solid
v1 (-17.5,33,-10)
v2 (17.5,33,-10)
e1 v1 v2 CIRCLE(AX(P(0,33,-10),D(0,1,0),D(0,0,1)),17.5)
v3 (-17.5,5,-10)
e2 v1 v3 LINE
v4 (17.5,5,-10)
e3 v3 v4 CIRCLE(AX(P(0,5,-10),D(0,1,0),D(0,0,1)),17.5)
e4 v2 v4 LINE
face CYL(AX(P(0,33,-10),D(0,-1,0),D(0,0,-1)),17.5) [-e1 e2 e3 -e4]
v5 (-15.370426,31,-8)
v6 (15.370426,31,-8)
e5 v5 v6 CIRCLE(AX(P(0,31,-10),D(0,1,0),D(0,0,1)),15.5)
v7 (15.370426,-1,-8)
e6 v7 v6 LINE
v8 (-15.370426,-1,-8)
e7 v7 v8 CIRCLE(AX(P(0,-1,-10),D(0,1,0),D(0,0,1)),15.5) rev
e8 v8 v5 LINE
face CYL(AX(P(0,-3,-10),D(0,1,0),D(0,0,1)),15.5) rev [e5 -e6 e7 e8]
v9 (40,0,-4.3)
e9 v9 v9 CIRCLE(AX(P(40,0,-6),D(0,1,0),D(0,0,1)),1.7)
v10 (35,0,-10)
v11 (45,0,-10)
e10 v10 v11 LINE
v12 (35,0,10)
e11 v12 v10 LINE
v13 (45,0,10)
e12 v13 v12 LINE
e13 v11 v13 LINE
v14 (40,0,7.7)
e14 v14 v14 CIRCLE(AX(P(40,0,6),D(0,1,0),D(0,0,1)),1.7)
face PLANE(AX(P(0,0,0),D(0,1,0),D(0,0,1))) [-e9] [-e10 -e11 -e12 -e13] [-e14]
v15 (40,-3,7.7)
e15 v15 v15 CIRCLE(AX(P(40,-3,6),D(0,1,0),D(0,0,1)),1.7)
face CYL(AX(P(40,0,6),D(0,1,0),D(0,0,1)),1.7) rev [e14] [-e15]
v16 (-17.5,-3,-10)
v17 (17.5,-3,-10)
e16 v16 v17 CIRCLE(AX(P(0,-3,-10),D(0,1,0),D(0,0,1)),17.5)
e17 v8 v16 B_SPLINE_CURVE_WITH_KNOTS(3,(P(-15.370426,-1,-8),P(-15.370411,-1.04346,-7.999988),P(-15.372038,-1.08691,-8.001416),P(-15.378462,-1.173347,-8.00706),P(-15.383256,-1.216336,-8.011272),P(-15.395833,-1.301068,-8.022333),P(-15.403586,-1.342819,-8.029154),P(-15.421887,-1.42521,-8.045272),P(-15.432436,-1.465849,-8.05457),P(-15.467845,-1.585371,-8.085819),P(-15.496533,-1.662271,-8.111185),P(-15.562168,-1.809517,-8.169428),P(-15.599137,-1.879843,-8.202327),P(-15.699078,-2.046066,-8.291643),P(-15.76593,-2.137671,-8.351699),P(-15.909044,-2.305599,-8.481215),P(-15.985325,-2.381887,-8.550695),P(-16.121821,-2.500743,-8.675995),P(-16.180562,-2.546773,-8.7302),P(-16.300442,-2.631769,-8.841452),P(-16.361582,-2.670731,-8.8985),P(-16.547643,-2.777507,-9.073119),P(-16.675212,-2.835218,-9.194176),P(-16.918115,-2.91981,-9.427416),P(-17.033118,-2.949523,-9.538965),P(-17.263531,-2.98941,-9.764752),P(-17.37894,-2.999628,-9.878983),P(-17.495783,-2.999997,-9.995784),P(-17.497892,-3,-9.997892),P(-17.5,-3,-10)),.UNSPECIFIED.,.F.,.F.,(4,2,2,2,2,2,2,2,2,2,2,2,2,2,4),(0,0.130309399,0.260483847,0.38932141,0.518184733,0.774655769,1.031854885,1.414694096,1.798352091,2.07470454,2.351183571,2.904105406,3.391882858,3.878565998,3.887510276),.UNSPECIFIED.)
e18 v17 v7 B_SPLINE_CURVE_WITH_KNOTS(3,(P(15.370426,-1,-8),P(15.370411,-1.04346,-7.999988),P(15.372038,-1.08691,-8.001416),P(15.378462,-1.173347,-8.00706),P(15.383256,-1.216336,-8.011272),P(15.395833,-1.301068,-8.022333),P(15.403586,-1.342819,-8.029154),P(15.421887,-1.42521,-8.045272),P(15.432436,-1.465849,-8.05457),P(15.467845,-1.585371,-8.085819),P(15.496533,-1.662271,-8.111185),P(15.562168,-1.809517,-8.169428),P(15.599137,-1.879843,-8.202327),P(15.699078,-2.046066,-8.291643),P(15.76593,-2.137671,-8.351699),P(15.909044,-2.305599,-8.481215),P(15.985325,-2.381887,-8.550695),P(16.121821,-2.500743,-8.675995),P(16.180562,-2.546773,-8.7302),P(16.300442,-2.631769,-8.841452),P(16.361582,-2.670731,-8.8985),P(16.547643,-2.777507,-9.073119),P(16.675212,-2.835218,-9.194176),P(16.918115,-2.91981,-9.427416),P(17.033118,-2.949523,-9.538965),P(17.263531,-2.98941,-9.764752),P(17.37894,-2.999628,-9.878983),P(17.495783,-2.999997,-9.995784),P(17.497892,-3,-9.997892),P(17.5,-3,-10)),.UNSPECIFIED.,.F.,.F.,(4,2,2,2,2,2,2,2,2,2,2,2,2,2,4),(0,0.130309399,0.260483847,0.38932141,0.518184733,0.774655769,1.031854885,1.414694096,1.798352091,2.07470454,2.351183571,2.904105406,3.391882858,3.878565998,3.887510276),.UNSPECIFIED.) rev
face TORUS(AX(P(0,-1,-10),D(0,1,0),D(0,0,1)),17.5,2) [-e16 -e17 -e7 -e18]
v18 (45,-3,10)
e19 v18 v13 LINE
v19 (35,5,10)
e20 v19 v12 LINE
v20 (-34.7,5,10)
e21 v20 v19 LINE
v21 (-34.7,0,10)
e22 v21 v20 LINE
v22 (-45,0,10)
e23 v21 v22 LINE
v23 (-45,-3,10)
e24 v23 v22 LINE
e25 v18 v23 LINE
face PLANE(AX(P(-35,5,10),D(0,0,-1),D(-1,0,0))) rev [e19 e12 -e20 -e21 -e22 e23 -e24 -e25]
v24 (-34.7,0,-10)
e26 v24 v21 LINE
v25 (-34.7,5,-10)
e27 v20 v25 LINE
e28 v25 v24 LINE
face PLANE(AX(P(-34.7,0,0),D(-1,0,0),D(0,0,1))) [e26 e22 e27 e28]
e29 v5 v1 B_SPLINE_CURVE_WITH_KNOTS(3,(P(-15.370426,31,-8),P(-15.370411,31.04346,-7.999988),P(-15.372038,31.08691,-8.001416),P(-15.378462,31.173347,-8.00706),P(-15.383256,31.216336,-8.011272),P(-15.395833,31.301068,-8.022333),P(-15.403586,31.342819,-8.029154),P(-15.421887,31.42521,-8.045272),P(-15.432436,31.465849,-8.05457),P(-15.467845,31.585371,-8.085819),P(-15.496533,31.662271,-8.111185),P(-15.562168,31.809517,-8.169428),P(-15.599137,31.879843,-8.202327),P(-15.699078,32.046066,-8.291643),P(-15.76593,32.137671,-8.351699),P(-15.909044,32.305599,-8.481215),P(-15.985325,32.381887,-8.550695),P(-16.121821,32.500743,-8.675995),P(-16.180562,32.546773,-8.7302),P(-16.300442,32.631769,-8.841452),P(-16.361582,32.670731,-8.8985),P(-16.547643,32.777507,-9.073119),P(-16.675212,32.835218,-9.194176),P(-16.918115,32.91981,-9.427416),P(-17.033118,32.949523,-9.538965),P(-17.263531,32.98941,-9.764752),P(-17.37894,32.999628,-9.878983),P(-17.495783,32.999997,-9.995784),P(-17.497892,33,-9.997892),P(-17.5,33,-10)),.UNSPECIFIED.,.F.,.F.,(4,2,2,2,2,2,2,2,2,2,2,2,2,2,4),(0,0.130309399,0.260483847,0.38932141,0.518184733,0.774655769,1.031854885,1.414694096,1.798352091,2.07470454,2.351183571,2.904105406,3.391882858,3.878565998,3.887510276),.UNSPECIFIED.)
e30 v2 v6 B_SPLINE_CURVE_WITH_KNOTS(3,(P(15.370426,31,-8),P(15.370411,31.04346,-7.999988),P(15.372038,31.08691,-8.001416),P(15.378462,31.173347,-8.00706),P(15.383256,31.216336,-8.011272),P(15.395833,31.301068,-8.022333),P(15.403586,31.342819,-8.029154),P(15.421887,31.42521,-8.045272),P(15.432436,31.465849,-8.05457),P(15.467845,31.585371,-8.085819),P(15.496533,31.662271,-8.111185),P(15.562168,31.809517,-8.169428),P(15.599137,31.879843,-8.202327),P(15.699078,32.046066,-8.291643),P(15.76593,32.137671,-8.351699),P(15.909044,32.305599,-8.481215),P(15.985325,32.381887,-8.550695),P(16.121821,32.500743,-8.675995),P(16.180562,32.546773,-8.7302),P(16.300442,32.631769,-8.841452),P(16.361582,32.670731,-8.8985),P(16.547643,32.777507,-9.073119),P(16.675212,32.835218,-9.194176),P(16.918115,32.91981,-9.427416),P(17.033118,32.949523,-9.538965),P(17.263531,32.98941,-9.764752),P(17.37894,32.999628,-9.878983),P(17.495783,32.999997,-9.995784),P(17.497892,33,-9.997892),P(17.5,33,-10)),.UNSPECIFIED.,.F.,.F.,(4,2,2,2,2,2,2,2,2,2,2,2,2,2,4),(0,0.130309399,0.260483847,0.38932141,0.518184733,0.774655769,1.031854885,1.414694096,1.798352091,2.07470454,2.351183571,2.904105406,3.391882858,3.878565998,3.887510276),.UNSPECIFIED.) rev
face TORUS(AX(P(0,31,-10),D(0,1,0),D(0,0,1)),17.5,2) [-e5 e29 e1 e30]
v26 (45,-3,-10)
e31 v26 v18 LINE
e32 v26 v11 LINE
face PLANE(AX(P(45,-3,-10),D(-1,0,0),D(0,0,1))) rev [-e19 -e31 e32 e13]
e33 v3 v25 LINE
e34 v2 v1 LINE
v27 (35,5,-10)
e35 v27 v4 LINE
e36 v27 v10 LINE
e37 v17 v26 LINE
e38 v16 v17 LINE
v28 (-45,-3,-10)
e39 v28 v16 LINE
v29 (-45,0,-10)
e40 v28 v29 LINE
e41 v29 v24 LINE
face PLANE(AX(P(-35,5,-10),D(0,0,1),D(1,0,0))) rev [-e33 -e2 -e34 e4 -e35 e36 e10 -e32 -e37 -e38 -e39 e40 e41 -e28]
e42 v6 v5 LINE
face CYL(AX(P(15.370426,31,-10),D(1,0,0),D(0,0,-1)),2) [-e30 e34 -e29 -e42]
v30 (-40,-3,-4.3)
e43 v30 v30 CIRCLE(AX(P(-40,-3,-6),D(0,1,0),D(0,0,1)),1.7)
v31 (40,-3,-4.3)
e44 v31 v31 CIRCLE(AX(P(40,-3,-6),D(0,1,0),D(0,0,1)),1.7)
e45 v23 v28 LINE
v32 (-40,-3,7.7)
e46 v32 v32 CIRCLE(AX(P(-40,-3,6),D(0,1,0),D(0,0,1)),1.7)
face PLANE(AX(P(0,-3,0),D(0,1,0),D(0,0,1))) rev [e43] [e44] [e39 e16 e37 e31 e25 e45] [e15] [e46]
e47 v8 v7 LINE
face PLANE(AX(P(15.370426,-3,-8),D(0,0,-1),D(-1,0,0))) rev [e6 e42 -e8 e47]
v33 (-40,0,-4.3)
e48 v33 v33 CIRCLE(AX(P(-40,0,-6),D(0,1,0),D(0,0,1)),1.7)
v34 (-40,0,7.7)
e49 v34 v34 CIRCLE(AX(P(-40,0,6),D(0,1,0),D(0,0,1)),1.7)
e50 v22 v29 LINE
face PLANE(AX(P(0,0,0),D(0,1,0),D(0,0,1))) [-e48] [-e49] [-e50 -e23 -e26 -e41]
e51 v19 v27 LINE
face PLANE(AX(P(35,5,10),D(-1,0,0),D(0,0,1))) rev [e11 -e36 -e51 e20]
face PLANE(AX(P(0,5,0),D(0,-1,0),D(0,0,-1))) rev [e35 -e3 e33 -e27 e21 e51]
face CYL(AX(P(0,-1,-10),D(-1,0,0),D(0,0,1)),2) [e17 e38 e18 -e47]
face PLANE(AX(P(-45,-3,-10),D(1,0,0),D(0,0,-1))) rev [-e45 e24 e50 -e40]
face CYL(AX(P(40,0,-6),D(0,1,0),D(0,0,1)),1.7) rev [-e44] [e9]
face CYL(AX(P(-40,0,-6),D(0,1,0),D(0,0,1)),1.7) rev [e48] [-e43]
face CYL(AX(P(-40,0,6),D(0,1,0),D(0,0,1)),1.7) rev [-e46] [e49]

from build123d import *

# Parameters (mm, degrees)
SKETCH1_W                = 70
SKETCH1_H                = 20
BOSS_EXTRUDE1_DEPTH      = 5
SKETCH2_W                = 90
SKETCH2_H                = 20
BOSS_EXTRUDE2_DEPTH      = 3
BOSS_EXTRUDE3_DEPTH      = 28
CUT_EXTRUDE1_DEPTH       = 59.489315264
FILLET1_R                = 2
FILLET2_R                = 2
M3_CLEARANCE_HOLE1_D     = 3.4
M3_CLEARANCE_HOLE1_DEPTH = 10
M3_CLEARANCE_HOLE1_TIP   = 1.021463052
SKETCH9_W                = 20
SKETCH9_H                = 5
CUT_EXTRUDE2_DEPTH       = 0.3


with BuildPart() as part:
    # Sketch1 → Boss-Extrude1 (new body)
    with BuildSketch(Plane(origin=(0, 0, 0), x_dir=(1, 0, 0), z_dir=(0, 1, 0))):
        Rectangle(SKETCH1_W, SKETCH1_H)
    extrude(amount=BOSS_EXTRUDE1_DEPTH)

    # Sketch2 → Boss-Extrude2 (add)
    with BuildSketch(Plane.XZ):
        Rectangle(SKETCH2_W, SKETCH2_H)
    extrude(amount=BOSS_EXTRUDE2_DEPTH)

    # Sketch4 → Boss-Extrude3 (add)
    with BuildSketch(Plane(origin=(0, 5, 0), x_dir=(1, 0, 0), z_dir=(0, 1, 0))):
        with BuildLine():
            Line((17.5, 10), (-17.5, 10))
            ThreePointArc((-17.5, 10), (0, -7.5), (17.5, 10))
        make_face()
    extrude(amount=BOSS_EXTRUDE3_DEPTH)

    # Sketch6 → Cut-Extrude1 (cut, through all)
    with BuildSketch(Plane(origin=(0, 33, 0), x_dir=(1, 0, 0), z_dir=(0, 1, 0))):
        with BuildLine():
            Line((15.370426149, 8), (-15.370426149, 8))
            ThreePointArc((-15.370426149, 8), (0, -5.5), (15.370426149, 8))
        make_face()
    extrude(amount=-CUT_EXTRUDE1_DEPTH, mode=Mode.SUBTRACT)

    # Fillet1
    fillet1_edges = [part.edges().sort_by_distance(p)[0] for p in [
        (0, 33, 5.5),
        (0, 33, -8),
    ]]
    fillet(fillet1_edges, radius=FILLET1_R - 0.0001)  # a hair under: the kernel refuses the full size

    # Fillet2
    fillet2_edges = [part.edges().sort_by_distance(p)[0] for p in [
        (0, -3, 5.5),
        (0, -3, -8),
    ]]
    fillet(fillet2_edges, radius=FILLET2_R - 0.0001)  # a hair under: the kernel refuses the full size

    # M3 Clearance Hole1
    with Locations(Plane(origin=(0, 0, 0), x_dir=(1, 0, 0), z_dir=(0, 1, 0))):
        with Locations((-40, 6), (-40, -6), (40, 6), (40, -6)):
            Hole(M3_CLEARANCE_HOLE1_D / 2, depth=M3_CLEARANCE_HOLE1_DEPTH)
            with Locations((0, 0, -(M3_CLEARANCE_HOLE1_DEPTH + M3_CLEARANCE_HOLE1_TIP / 2))):  # 118° drill point
                Cone(0, M3_CLEARANCE_HOLE1_D / 2, M3_CLEARANCE_HOLE1_TIP, mode=Mode.SUBTRACT)

    # Sketch9 → Cut-Extrude2 (cut)
    with BuildSketch(Plane.ZY.offset(35)):
        with Locations((0, 2.5)):
            Rectangle(SKETCH9_W, SKETCH9_H)
    extrude(amount=-CUT_EXTRUDE2_DEPTH, mode=Mode.SUBTRACT)


solid = part.part
